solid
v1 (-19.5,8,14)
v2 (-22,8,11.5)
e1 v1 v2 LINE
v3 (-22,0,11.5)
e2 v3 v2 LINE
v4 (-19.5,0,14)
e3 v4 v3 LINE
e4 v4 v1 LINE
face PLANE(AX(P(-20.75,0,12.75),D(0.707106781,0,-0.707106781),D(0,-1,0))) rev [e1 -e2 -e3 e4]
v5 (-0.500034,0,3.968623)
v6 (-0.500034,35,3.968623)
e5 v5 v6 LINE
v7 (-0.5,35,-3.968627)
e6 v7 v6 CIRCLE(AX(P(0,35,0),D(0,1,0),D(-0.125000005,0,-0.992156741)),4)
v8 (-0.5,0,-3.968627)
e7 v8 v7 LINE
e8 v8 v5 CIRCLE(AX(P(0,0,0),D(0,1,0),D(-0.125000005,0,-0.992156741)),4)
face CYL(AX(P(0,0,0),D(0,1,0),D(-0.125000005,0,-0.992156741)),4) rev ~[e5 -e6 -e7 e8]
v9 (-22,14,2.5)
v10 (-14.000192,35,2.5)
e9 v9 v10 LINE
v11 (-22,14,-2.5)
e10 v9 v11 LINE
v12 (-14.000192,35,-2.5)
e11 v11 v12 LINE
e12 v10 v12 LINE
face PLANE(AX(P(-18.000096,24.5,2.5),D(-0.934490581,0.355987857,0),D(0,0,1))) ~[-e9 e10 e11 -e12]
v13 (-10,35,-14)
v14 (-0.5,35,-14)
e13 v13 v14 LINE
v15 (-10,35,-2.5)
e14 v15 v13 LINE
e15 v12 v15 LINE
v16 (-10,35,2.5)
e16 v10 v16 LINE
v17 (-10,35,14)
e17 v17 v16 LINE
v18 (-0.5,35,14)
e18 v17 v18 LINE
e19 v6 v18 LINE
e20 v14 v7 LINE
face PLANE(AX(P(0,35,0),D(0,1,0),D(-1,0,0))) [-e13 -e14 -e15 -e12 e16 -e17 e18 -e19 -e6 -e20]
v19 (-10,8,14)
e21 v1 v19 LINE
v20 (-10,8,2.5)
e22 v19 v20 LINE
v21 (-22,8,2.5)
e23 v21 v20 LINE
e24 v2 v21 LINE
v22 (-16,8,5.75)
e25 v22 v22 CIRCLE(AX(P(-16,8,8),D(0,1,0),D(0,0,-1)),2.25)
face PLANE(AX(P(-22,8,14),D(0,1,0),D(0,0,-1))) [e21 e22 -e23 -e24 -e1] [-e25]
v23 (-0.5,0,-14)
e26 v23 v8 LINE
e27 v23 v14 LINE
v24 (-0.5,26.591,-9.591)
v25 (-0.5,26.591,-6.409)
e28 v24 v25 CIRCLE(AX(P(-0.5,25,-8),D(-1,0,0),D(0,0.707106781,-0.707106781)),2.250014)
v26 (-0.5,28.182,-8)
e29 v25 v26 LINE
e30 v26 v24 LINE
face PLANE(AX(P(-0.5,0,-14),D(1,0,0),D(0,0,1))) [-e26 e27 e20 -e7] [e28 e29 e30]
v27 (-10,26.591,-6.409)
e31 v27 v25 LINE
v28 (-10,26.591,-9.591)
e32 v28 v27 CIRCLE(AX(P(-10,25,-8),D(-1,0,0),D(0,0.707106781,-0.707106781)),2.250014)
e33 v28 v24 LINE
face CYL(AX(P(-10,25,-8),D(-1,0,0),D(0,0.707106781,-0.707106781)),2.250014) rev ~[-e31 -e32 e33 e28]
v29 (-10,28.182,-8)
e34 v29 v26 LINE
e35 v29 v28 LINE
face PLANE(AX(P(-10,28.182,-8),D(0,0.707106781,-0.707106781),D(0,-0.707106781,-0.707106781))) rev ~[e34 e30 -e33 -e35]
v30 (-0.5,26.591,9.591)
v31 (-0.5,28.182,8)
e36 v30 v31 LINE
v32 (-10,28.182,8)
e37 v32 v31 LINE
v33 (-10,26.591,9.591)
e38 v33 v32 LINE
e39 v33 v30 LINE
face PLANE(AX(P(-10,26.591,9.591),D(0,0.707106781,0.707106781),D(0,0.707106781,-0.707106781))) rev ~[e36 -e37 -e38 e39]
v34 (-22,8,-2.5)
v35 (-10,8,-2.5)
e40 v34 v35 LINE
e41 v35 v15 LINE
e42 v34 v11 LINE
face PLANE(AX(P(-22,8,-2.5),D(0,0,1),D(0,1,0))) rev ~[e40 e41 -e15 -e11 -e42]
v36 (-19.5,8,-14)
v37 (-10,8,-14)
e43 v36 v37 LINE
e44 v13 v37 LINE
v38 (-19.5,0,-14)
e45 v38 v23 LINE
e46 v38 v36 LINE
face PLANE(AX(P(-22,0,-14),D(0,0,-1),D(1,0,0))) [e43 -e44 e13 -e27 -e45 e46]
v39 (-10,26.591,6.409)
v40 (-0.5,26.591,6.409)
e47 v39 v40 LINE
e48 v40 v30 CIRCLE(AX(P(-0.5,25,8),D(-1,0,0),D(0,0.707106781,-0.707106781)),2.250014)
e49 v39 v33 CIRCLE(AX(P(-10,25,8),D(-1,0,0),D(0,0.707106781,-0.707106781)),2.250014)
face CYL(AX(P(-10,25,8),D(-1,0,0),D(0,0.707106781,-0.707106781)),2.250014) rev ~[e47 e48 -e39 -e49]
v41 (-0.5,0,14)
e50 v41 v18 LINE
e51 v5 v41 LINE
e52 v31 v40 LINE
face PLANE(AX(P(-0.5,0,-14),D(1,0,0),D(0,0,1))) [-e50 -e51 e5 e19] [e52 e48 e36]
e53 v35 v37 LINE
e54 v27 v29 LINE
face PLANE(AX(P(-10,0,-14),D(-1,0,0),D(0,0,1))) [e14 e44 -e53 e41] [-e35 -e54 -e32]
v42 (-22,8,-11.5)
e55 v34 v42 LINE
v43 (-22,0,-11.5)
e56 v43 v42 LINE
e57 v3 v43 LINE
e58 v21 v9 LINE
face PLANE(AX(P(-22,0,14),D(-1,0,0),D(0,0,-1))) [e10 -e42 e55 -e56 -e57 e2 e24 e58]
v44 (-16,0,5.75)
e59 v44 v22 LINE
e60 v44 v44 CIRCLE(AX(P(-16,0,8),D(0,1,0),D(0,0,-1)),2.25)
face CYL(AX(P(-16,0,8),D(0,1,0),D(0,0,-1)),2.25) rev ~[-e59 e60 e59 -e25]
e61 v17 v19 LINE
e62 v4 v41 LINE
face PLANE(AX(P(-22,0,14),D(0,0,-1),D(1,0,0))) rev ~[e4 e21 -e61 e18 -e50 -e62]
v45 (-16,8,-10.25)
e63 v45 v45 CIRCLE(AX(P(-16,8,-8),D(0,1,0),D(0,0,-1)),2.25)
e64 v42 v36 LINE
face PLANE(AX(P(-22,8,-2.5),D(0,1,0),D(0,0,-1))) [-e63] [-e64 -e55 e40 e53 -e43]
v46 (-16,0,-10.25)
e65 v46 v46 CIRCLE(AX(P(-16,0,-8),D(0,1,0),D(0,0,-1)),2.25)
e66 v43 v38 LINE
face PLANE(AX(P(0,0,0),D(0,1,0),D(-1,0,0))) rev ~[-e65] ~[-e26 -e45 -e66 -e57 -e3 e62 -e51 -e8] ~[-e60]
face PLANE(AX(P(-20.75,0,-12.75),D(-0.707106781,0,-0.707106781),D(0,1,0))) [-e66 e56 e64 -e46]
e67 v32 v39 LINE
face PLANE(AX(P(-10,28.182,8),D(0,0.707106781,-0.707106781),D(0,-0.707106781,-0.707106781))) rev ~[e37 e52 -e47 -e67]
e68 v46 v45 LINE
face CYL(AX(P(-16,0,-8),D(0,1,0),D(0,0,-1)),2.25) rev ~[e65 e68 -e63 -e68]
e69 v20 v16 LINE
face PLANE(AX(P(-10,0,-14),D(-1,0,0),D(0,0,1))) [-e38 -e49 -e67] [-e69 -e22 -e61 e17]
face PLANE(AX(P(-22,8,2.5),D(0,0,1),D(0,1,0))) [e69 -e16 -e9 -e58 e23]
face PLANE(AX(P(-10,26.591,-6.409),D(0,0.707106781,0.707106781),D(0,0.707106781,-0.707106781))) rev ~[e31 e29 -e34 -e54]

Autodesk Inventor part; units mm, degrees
ref_plane "YZ Plane" through (0, 0, 0) normal (1, 0, 0) x (0, 1, 0)
ref_plane "XZ Plane" through (0, 0, 0) normal (0, 1, 0) x (-1, 0, 0)
sketch "Sketch1" plane through (0, 0, 0) normal (0, 1, 0) x (-1, 0, 0)
  line L0 (22, -14) -> (0.5, -14)
  line L1 (0.5, -14) -> (0.5, 14)
  line L2 (22, 14) -> (0.5, 14)
  line L3 (22, 14) -> (22, -14)
extrude "Extrusion5" add sketch "Sketch1" along normal blind 35
sketch "Sketch2" plane through (-22, 0, -14) normal (-1, 0, 0) x (0, 0, 1)
  line L0 (28, 35) -> (16.5, 35)
  line L1 (16.5, 8) -> (16.5, 35)
  line L2 (28, 35) -> (28, 8)
  line L3 (28, 8) -> (16.5, 8)
extrude "Extrusion4" cut sketch "Sketch2" against normal blind 12 draft 0
sketch "Sketch3" plane through (-22, 0, -14) normal (-1, 0, 0) x (0, 0, 1)
  line L0 (11.5, 8) -> (11.5, 35)
  line L1 (0, 35) -> (0, 8)
  line L2 (11.5, 8) -> (0, 8)
  line L3 (11.5, 35) -> (0, 35)
extrude "Extrusion3" cut sketch "Sketch3" against normal blind 12 draft 0
chamfer "Chamfer3" distance 21 angle 20.854 1 edges at (-22, 35, 0) measured on face at (-22, 2.6667, -0.8333)
chamfer "Chamfer2" distance 2.5 angle 45 1 edges at (-22, 4, 14)
chamfer "Chamfer1" distance 2.5 angle 45 1 edges at (-22, 4, -14)
ref_plane "Work Plane1" through (0, 0, 0) normal (-0.9921567, 0, 0.125) x (0, 1, 0)
sketch "Sketch4" plane through (0, 0, 0) normal (-0.9921567, 0, 0.125) x (0, 1, 0)
  line L0 (0, 4) -> (35, 4)
  line L1 (0, 4) -> (0, 0)
  line L2 (35, 4) -> (35, 0)
  line L3 (0, 0) -> (35, 0)
  line L4 (0, 0) -> (10, 0)
revolve "Revolution1" cut sketch "Sketch4" angle 165.638 about axis through (0, 0, 0) along (0, 1, 0)
hole "Hole2" at (-16, 0, 8) direction (0, 1, 0) diameter 4.5 depth 8
sketch "Sketch5" plane through (0, 0, 0) normal (0, 1, 0) x (-1, 0, 0)
  point P0 (16, 8)
hole "Hole1" at (-16, 0, -8) direction (0, 1, 0) diameter 4.5 depth 8
sketch "Sketch7" plane through (-10, 0, -14) normal (-1, 0, 0) x (0, 0, 1)
  arc A0 (4.409, 26.591) -> (7.591, 26.591) centre (6, 25) ccw
  line L0 (6, 28.182) -> (4.409, 26.591)
  line L1 (7.591, 26.591) -> (6, 28.182)
extrude "Extrusion2" cut sketch "Sketch7" against normal blind 9.5
sketch "Sketch8" plane through (-10, 0, -14) normal (-1, 0, 0) x (0, 0, 1)
  line L0 (22, 28.182) -> (20.409, 26.591)
  line L1 (23.591, 26.591) -> (22, 28.182)
  arc A0 (20.409, 26.591) -> (23.591, 26.591) centre (22, 25) ccw
extrude "Extrusion1" cut sketch "Sketch8" against normal blind 9.5
sketch "Sketch6" plane through (0, 0, 0) normal (0, 1, 0) x (-1, 0, 0)
  point P0 (16, -8)
properties part number "Piston Smooth rod holder" material "ASA Plastic"
